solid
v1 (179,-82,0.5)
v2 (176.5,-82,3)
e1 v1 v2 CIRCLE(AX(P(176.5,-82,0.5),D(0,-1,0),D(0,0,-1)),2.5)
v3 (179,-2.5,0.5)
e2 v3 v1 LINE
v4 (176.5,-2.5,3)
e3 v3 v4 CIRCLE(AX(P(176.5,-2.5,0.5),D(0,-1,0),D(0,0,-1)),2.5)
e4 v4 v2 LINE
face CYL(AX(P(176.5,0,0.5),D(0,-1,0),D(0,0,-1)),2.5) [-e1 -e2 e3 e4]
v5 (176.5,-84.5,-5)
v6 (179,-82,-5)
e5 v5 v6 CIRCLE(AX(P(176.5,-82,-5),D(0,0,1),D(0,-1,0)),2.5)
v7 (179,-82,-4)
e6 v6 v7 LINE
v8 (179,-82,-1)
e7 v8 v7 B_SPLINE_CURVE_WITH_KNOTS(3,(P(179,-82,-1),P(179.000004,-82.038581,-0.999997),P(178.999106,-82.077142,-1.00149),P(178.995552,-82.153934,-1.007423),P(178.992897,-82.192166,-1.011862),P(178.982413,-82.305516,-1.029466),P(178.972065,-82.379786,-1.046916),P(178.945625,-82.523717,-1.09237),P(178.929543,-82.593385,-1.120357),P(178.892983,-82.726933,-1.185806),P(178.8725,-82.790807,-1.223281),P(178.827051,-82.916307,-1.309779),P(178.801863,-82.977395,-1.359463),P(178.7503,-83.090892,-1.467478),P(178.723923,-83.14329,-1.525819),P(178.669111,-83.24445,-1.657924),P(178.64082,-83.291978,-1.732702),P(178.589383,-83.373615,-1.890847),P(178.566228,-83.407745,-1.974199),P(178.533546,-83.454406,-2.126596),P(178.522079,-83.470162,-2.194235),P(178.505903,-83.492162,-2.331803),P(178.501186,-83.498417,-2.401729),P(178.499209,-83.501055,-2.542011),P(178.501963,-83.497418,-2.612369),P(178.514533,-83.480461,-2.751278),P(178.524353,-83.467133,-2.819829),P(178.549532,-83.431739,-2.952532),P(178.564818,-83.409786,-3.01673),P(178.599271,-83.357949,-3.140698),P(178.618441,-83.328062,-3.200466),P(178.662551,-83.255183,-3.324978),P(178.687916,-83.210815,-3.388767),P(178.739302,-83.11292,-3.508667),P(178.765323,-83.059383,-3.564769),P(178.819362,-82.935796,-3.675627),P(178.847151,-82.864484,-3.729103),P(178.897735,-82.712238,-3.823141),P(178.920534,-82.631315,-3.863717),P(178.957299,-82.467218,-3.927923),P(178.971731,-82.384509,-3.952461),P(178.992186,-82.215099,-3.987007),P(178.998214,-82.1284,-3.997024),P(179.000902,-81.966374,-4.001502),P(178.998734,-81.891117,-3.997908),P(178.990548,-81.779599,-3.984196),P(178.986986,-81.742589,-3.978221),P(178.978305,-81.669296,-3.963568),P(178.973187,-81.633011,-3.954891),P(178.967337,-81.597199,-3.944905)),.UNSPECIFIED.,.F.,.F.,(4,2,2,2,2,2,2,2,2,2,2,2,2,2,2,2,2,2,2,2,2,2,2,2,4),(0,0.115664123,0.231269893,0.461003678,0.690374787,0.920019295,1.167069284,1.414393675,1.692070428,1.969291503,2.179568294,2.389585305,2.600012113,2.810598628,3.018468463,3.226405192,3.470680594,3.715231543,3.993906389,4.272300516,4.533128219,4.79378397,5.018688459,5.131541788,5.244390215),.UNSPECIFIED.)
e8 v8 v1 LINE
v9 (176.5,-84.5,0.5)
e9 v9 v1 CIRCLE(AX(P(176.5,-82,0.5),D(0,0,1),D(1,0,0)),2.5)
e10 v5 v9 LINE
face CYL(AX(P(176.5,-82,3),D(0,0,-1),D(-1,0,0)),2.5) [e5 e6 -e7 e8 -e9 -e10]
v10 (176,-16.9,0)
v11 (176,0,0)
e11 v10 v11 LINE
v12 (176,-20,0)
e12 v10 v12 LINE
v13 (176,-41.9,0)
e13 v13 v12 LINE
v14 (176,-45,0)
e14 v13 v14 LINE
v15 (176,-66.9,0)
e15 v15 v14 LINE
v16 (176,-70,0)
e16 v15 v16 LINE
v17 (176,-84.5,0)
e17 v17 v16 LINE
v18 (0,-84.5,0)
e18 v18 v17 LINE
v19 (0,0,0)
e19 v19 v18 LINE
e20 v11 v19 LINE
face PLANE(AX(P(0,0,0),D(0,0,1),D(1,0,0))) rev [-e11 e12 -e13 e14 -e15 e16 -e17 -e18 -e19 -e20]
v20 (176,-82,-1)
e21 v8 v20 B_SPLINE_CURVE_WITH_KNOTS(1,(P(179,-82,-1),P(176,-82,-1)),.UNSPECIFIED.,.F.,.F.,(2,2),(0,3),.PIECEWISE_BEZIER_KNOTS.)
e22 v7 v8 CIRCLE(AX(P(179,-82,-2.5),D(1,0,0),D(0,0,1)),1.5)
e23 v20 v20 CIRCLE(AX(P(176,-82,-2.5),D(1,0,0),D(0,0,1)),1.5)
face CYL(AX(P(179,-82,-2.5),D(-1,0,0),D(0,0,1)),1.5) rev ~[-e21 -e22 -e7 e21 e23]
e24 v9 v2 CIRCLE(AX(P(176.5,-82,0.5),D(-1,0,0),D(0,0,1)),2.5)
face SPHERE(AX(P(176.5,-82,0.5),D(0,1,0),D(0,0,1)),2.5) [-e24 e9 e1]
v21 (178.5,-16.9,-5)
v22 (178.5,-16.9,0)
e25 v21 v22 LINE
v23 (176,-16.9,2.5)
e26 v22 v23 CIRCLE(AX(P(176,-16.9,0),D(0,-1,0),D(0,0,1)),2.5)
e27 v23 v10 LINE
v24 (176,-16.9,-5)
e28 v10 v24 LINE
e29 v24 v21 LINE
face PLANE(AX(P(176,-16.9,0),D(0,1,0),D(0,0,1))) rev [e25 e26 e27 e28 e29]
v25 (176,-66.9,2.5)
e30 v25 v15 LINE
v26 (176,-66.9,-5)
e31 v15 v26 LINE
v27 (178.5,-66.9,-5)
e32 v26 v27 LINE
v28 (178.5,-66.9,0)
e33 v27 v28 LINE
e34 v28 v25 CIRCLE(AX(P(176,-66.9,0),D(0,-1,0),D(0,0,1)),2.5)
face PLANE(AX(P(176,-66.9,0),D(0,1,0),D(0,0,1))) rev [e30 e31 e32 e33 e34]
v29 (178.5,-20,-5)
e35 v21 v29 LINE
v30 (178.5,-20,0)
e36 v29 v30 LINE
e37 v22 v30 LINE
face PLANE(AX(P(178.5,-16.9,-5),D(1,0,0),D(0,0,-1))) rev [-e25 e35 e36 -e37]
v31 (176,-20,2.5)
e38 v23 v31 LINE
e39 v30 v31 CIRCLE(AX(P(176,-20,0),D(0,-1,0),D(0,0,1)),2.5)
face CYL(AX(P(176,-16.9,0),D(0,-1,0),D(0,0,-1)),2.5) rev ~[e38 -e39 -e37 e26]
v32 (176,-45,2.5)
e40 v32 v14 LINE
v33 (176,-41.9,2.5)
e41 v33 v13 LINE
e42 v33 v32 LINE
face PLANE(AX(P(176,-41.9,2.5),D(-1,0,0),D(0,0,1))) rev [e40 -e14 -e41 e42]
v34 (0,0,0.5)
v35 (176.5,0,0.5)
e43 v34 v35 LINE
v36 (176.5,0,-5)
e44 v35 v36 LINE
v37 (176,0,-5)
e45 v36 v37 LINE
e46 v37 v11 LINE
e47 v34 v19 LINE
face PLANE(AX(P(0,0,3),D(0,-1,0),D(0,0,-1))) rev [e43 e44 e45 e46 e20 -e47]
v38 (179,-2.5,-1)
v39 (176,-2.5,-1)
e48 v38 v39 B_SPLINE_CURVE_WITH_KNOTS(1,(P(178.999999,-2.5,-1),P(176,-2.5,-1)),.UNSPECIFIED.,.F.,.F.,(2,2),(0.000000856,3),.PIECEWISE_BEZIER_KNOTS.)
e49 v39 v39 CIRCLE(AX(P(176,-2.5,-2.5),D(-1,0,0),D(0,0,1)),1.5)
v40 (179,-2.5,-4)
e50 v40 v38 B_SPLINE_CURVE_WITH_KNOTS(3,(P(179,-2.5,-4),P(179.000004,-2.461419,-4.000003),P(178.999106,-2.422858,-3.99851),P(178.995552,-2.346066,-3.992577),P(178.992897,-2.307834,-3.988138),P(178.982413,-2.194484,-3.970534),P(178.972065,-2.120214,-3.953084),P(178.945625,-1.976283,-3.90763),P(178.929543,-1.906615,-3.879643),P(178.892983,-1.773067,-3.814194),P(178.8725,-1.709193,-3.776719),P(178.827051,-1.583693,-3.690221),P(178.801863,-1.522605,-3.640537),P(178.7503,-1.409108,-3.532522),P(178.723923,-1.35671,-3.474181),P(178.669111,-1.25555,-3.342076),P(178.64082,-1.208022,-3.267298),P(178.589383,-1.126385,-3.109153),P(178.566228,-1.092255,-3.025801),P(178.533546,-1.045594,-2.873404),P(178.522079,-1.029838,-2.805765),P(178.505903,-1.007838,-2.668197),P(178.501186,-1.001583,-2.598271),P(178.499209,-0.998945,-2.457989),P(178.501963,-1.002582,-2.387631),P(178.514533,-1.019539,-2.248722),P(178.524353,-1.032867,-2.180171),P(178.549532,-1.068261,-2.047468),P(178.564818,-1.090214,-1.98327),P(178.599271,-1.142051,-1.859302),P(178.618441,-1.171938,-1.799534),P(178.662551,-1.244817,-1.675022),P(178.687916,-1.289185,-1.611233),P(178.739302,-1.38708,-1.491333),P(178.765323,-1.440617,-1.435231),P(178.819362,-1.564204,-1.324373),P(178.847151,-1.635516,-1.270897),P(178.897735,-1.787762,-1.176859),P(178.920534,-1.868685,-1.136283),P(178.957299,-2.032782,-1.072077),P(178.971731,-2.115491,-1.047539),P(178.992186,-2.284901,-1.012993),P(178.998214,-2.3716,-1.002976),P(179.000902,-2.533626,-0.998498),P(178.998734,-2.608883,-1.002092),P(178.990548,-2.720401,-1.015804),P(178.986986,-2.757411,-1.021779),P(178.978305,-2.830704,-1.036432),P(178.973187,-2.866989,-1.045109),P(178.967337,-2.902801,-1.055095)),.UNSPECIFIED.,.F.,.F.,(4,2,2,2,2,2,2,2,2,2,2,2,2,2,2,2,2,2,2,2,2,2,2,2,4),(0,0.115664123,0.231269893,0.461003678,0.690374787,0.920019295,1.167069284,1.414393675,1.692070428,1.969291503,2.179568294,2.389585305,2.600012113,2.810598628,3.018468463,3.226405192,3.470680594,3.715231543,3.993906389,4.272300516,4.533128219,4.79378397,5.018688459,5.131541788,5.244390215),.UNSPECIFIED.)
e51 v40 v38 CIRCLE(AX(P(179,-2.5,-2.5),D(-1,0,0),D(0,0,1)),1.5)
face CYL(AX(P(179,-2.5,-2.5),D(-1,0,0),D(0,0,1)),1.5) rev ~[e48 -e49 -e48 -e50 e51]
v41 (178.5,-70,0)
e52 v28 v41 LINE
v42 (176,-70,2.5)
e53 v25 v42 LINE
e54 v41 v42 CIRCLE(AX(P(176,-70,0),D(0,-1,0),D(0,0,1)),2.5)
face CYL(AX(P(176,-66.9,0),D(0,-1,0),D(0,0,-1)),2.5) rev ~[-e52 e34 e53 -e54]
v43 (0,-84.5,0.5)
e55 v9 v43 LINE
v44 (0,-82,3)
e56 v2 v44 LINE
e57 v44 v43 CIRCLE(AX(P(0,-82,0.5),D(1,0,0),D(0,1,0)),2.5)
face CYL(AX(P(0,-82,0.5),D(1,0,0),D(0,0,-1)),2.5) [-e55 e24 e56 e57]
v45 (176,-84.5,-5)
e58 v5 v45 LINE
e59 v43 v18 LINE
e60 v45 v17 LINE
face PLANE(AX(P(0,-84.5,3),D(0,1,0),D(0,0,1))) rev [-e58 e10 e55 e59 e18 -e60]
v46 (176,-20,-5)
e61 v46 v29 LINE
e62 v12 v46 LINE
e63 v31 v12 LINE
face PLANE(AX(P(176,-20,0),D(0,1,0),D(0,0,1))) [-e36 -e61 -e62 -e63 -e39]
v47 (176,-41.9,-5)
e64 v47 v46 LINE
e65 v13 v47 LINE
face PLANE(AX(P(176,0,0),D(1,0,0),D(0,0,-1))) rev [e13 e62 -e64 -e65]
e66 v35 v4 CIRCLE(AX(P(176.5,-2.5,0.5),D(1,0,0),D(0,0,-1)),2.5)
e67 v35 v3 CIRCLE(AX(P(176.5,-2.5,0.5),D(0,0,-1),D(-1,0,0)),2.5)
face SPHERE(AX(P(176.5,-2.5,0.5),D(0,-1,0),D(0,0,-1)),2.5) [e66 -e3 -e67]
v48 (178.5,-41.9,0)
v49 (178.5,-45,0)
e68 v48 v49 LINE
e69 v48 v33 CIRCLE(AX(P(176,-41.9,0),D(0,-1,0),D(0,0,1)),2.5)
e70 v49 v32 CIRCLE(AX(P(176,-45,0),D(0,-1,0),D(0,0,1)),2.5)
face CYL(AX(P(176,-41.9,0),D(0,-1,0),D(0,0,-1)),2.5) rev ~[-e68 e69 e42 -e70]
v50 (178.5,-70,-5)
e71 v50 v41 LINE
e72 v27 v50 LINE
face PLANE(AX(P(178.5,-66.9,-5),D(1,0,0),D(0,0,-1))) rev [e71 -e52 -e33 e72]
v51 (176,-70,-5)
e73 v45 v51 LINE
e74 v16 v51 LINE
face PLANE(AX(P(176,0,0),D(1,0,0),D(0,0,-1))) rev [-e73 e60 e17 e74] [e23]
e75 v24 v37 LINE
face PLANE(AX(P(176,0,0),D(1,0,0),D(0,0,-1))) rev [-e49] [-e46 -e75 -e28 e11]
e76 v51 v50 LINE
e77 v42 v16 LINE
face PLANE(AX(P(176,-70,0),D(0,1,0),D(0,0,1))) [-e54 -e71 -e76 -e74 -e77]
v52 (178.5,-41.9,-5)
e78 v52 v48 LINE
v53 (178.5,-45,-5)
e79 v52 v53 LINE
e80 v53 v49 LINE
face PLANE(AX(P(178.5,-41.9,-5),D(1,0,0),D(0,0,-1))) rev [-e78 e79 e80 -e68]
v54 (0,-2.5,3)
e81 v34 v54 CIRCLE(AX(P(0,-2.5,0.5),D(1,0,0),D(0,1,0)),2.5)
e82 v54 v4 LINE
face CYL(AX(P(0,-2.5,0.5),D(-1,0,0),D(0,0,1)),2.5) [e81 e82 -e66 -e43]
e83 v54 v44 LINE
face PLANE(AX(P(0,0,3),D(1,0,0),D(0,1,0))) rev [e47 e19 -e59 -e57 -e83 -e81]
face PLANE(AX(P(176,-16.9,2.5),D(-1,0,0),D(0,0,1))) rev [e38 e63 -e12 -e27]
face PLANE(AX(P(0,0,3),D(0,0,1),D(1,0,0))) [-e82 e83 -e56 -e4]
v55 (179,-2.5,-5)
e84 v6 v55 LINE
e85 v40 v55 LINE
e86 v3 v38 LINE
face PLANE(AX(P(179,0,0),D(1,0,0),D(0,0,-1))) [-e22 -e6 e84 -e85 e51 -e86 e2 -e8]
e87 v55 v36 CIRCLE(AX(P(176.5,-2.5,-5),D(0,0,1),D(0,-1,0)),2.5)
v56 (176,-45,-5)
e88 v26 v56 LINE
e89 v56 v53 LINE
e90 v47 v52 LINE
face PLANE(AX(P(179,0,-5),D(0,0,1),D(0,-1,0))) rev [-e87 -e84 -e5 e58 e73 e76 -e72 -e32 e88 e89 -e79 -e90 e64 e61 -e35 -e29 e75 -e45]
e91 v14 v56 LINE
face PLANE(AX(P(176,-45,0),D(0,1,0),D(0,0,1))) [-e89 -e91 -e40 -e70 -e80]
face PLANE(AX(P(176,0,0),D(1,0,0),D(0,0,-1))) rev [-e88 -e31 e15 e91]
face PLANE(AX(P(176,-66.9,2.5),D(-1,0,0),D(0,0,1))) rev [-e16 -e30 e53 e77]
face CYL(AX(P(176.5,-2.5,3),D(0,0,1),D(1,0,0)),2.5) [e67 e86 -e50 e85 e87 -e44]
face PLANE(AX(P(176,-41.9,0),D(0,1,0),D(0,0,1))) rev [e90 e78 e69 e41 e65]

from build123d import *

# Parameters (mm, degrees)
SKETCH1_W           = 176
SKETCH1_H           = 84.5
BOSS_EXTRUDE1_DEPTH = 3
SKETCH2_W           = 8
SKETCH2_H           = 5
BOSS_EXTRUDE2_DEPTH = 3
SKETCH3_R           = 1.5
CUT_EXTRUDE1_DEPTH  = 3
SKETCH4_W           = 3
SKETCH4_H           = 8
BOSS_EXTRUDE3_DEPTH = 74.5
CUT_EXTRUDE2_DEPTH  = 3.1
FILLET3_R           = 2.5
FILLET4_R           = 2.5
FILLET7_R           = 2.5
LPATTERN1_COUNT     = 3
LPATTERN1_PITCH     = 25


with BuildPart() as part:
    # Sketch1 → Boss-Extrude1 (new body)
    with BuildSketch(Plane.XY):
        with Locations((88, -42.25)):
            Rectangle(SKETCH1_W, SKETCH1_H)
    extrude(amount=BOSS_EXTRUDE1_DEPTH)

    # Sketch2 → Boss-Extrude2 (add)
    with BuildSketch(Plane(origin=(176, 0, 0), x_dir=(0, 0, -1), z_dir=(1, 0, 0))):
        with Locations((1, -2.5)):
            Rectangle(SKETCH2_W, SKETCH2_H)
    boss_extrude2 = extrude(amount=BOSS_EXTRUDE2_DEPTH)

    # Sketch3 → Cut-Extrude1 (cut)
    with BuildSketch(Plane.ZY.offset(-176)):
        with Locations((-2.5, -2.5)):
            Circle(SKETCH3_R)
    cut_extrude1 = extrude(amount=-CUT_EXTRUDE1_DEPTH, mode=Mode.SUBTRACT)

    # Mirror3: Boss-Extrude2, Cut-Extrude1 across plane
    add(boss_extrude2.mirror(Plane(origin=(0, -42.25, 0), x_dir=(0, 0, 1), z_dir=(0, -1, 0))))
    add(cut_extrude1.mirror(Plane(origin=(0, -42.25, 0), x_dir=(0, 0, 1), z_dir=(0, -1, 0))), mode=Mode.SUBTRACT)

    # Sketch4 → Boss-Extrude3 (add)
    with BuildSketch(Plane(origin=(0, -79.5, 0), x_dir=(1, 0, 0), z_dir=(0, 1, 0))):
        with Locations((177.5, 1)):
            Rectangle(SKETCH4_W, SKETCH4_H)
    extrude(amount=BOSS_EXTRUDE3_DEPTH)

    # Sketch12 → Cut-Extrude2 (cut)
    with BuildSketch(Plane(origin=(0, -70, 0), x_dir=(-1, 0, 0), z_dir=(0, -1, 0))):
        with BuildLine():
            Line((-176, -2.5), (-176, 0))
            Line((-176, 0), (-176, 5))
            Line((-176, 5), (-178.5, 5))
            Line((-178.5, 5), (-178.5, 0))
            ThreePointArc((-178.5, 0), (-177.767766953, -1.767766953), (-176, -2.5))
        make_face()
    cut_extrude2 = extrude(amount=-CUT_EXTRUDE2_DEPTH, mode=Mode.SUBTRACT)

    # Fillet3
    fillet3_edges = [part.edges().sort_by_distance(p)[0] for p in [
        (179, -42.25, 3),
    ]]
    fillet(fillet3_edges, radius=FILLET3_R)

    # Fillet4
    # the kernel refuses this fillet: 2.5 mm, written as the material it takes off along each edge
    with BuildSketch(Plane(origin=(179, -84.5, 0.5), x_dir=(0, 1, 0), z_dir=(0, 0, -1))) as fillet4_piece_1:
        with BuildLine():
            CenterArc((FILLET4_R, -FILLET4_R), FILLET4_R, 90, 90)
            Line((0, -FILLET4_R), (0, 0))
            Line((0, 0), (FILLET4_R, 0))
        make_face()
    extrude(amount=11.75, mode=Mode.SUBTRACT)
    with BuildSketch(Plane(origin=(176.5, -84.5, 0.5), x_dir=(0, 0, 1), z_dir=(-1, 0, 0))) as fillet4_piece_2:
        with BuildLine():
            CenterArc((2.5 - FILLET4_R, FILLET4_R), FILLET4_R, 270, 90)
            Line((2.5 - FILLET4_R, 0), (2.5, 0))
            Line((2.5, 0), (2.5, FILLET4_R))
        make_face()
    revolve(axis=Axis((176.5, -84.5, 0.5), (0, 1, 0)), revolution_arc=90, mode=Mode.SUBTRACT)
    with BuildSketch(Plane(origin=(-6.25, -84.5, 3), x_dir=(0, 1, 0), z_dir=(1, 0, 0))) as fillet4_piece_3:
        with BuildLine():
            CenterArc((FILLET4_R, -FILLET4_R), FILLET4_R, 90, 90)
            Line((0, -FILLET4_R), (0, 0))
            Line((0, 0), (FILLET4_R, 0))
        make_face()
    extrude(amount=182.75, mode=Mode.SUBTRACT)

    # Fillet7
    # the kernel refuses this fillet: 2.5 mm, written as the material it takes off along each edge
    with BuildSketch(Plane(origin=(179, 0, 0.5), x_dir=(-1, 0, 0), z_dir=(0, 0, -1))) as fillet7_piece_1:
        with BuildLine():
            CenterArc((FILLET7_R, -FILLET7_R), FILLET7_R, 90, 90)
            Line((0, -FILLET7_R), (0, 0))
            Line((0, 0), (FILLET7_R, 0))
        make_face()
    extrude(amount=11.75, mode=Mode.SUBTRACT)
    with BuildSketch(Plane(origin=(-6.25, 0, 3), x_dir=(0, 0, -1), z_dir=(1, 0, 0))) as fillet7_piece_2:
        with BuildLine():
            CenterArc((FILLET7_R, -FILLET7_R), FILLET7_R, 90, 90)
            Line((0, -FILLET7_R), (0, 0))
            Line((0, 0), (FILLET7_R, 0))
        make_face()
    extrude(amount=182.75, mode=Mode.SUBTRACT)
    with BuildSketch(Plane(origin=(176.5, 0, 0.5), x_dir=(0, 0, 1), z_dir=(-1, 0, 0))) as fillet7_piece_3:
        with BuildLine():
            CenterArc((2.5 - FILLET7_R, -FILLET7_R), FILLET7_R, 0, 90)
            Line((2.5, -FILLET7_R), (2.5, 0))
            Line((2.5, 0), (2.5 - FILLET7_R, 0))
        make_face()
    revolve(axis=Axis((176.5, 0, 0.5), (0, 1, 0)), revolution_arc=90, mode=Mode.SUBTRACT)

    # LPattern1: Cut-Extrude2 ×3
    with Locations(*[(0, i * LPATTERN1_PITCH, 0) for i in range(1, LPATTERN1_COUNT)]):
        add(cut_extrude2, mode=Mode.SUBTRACT)


solid = part.part
